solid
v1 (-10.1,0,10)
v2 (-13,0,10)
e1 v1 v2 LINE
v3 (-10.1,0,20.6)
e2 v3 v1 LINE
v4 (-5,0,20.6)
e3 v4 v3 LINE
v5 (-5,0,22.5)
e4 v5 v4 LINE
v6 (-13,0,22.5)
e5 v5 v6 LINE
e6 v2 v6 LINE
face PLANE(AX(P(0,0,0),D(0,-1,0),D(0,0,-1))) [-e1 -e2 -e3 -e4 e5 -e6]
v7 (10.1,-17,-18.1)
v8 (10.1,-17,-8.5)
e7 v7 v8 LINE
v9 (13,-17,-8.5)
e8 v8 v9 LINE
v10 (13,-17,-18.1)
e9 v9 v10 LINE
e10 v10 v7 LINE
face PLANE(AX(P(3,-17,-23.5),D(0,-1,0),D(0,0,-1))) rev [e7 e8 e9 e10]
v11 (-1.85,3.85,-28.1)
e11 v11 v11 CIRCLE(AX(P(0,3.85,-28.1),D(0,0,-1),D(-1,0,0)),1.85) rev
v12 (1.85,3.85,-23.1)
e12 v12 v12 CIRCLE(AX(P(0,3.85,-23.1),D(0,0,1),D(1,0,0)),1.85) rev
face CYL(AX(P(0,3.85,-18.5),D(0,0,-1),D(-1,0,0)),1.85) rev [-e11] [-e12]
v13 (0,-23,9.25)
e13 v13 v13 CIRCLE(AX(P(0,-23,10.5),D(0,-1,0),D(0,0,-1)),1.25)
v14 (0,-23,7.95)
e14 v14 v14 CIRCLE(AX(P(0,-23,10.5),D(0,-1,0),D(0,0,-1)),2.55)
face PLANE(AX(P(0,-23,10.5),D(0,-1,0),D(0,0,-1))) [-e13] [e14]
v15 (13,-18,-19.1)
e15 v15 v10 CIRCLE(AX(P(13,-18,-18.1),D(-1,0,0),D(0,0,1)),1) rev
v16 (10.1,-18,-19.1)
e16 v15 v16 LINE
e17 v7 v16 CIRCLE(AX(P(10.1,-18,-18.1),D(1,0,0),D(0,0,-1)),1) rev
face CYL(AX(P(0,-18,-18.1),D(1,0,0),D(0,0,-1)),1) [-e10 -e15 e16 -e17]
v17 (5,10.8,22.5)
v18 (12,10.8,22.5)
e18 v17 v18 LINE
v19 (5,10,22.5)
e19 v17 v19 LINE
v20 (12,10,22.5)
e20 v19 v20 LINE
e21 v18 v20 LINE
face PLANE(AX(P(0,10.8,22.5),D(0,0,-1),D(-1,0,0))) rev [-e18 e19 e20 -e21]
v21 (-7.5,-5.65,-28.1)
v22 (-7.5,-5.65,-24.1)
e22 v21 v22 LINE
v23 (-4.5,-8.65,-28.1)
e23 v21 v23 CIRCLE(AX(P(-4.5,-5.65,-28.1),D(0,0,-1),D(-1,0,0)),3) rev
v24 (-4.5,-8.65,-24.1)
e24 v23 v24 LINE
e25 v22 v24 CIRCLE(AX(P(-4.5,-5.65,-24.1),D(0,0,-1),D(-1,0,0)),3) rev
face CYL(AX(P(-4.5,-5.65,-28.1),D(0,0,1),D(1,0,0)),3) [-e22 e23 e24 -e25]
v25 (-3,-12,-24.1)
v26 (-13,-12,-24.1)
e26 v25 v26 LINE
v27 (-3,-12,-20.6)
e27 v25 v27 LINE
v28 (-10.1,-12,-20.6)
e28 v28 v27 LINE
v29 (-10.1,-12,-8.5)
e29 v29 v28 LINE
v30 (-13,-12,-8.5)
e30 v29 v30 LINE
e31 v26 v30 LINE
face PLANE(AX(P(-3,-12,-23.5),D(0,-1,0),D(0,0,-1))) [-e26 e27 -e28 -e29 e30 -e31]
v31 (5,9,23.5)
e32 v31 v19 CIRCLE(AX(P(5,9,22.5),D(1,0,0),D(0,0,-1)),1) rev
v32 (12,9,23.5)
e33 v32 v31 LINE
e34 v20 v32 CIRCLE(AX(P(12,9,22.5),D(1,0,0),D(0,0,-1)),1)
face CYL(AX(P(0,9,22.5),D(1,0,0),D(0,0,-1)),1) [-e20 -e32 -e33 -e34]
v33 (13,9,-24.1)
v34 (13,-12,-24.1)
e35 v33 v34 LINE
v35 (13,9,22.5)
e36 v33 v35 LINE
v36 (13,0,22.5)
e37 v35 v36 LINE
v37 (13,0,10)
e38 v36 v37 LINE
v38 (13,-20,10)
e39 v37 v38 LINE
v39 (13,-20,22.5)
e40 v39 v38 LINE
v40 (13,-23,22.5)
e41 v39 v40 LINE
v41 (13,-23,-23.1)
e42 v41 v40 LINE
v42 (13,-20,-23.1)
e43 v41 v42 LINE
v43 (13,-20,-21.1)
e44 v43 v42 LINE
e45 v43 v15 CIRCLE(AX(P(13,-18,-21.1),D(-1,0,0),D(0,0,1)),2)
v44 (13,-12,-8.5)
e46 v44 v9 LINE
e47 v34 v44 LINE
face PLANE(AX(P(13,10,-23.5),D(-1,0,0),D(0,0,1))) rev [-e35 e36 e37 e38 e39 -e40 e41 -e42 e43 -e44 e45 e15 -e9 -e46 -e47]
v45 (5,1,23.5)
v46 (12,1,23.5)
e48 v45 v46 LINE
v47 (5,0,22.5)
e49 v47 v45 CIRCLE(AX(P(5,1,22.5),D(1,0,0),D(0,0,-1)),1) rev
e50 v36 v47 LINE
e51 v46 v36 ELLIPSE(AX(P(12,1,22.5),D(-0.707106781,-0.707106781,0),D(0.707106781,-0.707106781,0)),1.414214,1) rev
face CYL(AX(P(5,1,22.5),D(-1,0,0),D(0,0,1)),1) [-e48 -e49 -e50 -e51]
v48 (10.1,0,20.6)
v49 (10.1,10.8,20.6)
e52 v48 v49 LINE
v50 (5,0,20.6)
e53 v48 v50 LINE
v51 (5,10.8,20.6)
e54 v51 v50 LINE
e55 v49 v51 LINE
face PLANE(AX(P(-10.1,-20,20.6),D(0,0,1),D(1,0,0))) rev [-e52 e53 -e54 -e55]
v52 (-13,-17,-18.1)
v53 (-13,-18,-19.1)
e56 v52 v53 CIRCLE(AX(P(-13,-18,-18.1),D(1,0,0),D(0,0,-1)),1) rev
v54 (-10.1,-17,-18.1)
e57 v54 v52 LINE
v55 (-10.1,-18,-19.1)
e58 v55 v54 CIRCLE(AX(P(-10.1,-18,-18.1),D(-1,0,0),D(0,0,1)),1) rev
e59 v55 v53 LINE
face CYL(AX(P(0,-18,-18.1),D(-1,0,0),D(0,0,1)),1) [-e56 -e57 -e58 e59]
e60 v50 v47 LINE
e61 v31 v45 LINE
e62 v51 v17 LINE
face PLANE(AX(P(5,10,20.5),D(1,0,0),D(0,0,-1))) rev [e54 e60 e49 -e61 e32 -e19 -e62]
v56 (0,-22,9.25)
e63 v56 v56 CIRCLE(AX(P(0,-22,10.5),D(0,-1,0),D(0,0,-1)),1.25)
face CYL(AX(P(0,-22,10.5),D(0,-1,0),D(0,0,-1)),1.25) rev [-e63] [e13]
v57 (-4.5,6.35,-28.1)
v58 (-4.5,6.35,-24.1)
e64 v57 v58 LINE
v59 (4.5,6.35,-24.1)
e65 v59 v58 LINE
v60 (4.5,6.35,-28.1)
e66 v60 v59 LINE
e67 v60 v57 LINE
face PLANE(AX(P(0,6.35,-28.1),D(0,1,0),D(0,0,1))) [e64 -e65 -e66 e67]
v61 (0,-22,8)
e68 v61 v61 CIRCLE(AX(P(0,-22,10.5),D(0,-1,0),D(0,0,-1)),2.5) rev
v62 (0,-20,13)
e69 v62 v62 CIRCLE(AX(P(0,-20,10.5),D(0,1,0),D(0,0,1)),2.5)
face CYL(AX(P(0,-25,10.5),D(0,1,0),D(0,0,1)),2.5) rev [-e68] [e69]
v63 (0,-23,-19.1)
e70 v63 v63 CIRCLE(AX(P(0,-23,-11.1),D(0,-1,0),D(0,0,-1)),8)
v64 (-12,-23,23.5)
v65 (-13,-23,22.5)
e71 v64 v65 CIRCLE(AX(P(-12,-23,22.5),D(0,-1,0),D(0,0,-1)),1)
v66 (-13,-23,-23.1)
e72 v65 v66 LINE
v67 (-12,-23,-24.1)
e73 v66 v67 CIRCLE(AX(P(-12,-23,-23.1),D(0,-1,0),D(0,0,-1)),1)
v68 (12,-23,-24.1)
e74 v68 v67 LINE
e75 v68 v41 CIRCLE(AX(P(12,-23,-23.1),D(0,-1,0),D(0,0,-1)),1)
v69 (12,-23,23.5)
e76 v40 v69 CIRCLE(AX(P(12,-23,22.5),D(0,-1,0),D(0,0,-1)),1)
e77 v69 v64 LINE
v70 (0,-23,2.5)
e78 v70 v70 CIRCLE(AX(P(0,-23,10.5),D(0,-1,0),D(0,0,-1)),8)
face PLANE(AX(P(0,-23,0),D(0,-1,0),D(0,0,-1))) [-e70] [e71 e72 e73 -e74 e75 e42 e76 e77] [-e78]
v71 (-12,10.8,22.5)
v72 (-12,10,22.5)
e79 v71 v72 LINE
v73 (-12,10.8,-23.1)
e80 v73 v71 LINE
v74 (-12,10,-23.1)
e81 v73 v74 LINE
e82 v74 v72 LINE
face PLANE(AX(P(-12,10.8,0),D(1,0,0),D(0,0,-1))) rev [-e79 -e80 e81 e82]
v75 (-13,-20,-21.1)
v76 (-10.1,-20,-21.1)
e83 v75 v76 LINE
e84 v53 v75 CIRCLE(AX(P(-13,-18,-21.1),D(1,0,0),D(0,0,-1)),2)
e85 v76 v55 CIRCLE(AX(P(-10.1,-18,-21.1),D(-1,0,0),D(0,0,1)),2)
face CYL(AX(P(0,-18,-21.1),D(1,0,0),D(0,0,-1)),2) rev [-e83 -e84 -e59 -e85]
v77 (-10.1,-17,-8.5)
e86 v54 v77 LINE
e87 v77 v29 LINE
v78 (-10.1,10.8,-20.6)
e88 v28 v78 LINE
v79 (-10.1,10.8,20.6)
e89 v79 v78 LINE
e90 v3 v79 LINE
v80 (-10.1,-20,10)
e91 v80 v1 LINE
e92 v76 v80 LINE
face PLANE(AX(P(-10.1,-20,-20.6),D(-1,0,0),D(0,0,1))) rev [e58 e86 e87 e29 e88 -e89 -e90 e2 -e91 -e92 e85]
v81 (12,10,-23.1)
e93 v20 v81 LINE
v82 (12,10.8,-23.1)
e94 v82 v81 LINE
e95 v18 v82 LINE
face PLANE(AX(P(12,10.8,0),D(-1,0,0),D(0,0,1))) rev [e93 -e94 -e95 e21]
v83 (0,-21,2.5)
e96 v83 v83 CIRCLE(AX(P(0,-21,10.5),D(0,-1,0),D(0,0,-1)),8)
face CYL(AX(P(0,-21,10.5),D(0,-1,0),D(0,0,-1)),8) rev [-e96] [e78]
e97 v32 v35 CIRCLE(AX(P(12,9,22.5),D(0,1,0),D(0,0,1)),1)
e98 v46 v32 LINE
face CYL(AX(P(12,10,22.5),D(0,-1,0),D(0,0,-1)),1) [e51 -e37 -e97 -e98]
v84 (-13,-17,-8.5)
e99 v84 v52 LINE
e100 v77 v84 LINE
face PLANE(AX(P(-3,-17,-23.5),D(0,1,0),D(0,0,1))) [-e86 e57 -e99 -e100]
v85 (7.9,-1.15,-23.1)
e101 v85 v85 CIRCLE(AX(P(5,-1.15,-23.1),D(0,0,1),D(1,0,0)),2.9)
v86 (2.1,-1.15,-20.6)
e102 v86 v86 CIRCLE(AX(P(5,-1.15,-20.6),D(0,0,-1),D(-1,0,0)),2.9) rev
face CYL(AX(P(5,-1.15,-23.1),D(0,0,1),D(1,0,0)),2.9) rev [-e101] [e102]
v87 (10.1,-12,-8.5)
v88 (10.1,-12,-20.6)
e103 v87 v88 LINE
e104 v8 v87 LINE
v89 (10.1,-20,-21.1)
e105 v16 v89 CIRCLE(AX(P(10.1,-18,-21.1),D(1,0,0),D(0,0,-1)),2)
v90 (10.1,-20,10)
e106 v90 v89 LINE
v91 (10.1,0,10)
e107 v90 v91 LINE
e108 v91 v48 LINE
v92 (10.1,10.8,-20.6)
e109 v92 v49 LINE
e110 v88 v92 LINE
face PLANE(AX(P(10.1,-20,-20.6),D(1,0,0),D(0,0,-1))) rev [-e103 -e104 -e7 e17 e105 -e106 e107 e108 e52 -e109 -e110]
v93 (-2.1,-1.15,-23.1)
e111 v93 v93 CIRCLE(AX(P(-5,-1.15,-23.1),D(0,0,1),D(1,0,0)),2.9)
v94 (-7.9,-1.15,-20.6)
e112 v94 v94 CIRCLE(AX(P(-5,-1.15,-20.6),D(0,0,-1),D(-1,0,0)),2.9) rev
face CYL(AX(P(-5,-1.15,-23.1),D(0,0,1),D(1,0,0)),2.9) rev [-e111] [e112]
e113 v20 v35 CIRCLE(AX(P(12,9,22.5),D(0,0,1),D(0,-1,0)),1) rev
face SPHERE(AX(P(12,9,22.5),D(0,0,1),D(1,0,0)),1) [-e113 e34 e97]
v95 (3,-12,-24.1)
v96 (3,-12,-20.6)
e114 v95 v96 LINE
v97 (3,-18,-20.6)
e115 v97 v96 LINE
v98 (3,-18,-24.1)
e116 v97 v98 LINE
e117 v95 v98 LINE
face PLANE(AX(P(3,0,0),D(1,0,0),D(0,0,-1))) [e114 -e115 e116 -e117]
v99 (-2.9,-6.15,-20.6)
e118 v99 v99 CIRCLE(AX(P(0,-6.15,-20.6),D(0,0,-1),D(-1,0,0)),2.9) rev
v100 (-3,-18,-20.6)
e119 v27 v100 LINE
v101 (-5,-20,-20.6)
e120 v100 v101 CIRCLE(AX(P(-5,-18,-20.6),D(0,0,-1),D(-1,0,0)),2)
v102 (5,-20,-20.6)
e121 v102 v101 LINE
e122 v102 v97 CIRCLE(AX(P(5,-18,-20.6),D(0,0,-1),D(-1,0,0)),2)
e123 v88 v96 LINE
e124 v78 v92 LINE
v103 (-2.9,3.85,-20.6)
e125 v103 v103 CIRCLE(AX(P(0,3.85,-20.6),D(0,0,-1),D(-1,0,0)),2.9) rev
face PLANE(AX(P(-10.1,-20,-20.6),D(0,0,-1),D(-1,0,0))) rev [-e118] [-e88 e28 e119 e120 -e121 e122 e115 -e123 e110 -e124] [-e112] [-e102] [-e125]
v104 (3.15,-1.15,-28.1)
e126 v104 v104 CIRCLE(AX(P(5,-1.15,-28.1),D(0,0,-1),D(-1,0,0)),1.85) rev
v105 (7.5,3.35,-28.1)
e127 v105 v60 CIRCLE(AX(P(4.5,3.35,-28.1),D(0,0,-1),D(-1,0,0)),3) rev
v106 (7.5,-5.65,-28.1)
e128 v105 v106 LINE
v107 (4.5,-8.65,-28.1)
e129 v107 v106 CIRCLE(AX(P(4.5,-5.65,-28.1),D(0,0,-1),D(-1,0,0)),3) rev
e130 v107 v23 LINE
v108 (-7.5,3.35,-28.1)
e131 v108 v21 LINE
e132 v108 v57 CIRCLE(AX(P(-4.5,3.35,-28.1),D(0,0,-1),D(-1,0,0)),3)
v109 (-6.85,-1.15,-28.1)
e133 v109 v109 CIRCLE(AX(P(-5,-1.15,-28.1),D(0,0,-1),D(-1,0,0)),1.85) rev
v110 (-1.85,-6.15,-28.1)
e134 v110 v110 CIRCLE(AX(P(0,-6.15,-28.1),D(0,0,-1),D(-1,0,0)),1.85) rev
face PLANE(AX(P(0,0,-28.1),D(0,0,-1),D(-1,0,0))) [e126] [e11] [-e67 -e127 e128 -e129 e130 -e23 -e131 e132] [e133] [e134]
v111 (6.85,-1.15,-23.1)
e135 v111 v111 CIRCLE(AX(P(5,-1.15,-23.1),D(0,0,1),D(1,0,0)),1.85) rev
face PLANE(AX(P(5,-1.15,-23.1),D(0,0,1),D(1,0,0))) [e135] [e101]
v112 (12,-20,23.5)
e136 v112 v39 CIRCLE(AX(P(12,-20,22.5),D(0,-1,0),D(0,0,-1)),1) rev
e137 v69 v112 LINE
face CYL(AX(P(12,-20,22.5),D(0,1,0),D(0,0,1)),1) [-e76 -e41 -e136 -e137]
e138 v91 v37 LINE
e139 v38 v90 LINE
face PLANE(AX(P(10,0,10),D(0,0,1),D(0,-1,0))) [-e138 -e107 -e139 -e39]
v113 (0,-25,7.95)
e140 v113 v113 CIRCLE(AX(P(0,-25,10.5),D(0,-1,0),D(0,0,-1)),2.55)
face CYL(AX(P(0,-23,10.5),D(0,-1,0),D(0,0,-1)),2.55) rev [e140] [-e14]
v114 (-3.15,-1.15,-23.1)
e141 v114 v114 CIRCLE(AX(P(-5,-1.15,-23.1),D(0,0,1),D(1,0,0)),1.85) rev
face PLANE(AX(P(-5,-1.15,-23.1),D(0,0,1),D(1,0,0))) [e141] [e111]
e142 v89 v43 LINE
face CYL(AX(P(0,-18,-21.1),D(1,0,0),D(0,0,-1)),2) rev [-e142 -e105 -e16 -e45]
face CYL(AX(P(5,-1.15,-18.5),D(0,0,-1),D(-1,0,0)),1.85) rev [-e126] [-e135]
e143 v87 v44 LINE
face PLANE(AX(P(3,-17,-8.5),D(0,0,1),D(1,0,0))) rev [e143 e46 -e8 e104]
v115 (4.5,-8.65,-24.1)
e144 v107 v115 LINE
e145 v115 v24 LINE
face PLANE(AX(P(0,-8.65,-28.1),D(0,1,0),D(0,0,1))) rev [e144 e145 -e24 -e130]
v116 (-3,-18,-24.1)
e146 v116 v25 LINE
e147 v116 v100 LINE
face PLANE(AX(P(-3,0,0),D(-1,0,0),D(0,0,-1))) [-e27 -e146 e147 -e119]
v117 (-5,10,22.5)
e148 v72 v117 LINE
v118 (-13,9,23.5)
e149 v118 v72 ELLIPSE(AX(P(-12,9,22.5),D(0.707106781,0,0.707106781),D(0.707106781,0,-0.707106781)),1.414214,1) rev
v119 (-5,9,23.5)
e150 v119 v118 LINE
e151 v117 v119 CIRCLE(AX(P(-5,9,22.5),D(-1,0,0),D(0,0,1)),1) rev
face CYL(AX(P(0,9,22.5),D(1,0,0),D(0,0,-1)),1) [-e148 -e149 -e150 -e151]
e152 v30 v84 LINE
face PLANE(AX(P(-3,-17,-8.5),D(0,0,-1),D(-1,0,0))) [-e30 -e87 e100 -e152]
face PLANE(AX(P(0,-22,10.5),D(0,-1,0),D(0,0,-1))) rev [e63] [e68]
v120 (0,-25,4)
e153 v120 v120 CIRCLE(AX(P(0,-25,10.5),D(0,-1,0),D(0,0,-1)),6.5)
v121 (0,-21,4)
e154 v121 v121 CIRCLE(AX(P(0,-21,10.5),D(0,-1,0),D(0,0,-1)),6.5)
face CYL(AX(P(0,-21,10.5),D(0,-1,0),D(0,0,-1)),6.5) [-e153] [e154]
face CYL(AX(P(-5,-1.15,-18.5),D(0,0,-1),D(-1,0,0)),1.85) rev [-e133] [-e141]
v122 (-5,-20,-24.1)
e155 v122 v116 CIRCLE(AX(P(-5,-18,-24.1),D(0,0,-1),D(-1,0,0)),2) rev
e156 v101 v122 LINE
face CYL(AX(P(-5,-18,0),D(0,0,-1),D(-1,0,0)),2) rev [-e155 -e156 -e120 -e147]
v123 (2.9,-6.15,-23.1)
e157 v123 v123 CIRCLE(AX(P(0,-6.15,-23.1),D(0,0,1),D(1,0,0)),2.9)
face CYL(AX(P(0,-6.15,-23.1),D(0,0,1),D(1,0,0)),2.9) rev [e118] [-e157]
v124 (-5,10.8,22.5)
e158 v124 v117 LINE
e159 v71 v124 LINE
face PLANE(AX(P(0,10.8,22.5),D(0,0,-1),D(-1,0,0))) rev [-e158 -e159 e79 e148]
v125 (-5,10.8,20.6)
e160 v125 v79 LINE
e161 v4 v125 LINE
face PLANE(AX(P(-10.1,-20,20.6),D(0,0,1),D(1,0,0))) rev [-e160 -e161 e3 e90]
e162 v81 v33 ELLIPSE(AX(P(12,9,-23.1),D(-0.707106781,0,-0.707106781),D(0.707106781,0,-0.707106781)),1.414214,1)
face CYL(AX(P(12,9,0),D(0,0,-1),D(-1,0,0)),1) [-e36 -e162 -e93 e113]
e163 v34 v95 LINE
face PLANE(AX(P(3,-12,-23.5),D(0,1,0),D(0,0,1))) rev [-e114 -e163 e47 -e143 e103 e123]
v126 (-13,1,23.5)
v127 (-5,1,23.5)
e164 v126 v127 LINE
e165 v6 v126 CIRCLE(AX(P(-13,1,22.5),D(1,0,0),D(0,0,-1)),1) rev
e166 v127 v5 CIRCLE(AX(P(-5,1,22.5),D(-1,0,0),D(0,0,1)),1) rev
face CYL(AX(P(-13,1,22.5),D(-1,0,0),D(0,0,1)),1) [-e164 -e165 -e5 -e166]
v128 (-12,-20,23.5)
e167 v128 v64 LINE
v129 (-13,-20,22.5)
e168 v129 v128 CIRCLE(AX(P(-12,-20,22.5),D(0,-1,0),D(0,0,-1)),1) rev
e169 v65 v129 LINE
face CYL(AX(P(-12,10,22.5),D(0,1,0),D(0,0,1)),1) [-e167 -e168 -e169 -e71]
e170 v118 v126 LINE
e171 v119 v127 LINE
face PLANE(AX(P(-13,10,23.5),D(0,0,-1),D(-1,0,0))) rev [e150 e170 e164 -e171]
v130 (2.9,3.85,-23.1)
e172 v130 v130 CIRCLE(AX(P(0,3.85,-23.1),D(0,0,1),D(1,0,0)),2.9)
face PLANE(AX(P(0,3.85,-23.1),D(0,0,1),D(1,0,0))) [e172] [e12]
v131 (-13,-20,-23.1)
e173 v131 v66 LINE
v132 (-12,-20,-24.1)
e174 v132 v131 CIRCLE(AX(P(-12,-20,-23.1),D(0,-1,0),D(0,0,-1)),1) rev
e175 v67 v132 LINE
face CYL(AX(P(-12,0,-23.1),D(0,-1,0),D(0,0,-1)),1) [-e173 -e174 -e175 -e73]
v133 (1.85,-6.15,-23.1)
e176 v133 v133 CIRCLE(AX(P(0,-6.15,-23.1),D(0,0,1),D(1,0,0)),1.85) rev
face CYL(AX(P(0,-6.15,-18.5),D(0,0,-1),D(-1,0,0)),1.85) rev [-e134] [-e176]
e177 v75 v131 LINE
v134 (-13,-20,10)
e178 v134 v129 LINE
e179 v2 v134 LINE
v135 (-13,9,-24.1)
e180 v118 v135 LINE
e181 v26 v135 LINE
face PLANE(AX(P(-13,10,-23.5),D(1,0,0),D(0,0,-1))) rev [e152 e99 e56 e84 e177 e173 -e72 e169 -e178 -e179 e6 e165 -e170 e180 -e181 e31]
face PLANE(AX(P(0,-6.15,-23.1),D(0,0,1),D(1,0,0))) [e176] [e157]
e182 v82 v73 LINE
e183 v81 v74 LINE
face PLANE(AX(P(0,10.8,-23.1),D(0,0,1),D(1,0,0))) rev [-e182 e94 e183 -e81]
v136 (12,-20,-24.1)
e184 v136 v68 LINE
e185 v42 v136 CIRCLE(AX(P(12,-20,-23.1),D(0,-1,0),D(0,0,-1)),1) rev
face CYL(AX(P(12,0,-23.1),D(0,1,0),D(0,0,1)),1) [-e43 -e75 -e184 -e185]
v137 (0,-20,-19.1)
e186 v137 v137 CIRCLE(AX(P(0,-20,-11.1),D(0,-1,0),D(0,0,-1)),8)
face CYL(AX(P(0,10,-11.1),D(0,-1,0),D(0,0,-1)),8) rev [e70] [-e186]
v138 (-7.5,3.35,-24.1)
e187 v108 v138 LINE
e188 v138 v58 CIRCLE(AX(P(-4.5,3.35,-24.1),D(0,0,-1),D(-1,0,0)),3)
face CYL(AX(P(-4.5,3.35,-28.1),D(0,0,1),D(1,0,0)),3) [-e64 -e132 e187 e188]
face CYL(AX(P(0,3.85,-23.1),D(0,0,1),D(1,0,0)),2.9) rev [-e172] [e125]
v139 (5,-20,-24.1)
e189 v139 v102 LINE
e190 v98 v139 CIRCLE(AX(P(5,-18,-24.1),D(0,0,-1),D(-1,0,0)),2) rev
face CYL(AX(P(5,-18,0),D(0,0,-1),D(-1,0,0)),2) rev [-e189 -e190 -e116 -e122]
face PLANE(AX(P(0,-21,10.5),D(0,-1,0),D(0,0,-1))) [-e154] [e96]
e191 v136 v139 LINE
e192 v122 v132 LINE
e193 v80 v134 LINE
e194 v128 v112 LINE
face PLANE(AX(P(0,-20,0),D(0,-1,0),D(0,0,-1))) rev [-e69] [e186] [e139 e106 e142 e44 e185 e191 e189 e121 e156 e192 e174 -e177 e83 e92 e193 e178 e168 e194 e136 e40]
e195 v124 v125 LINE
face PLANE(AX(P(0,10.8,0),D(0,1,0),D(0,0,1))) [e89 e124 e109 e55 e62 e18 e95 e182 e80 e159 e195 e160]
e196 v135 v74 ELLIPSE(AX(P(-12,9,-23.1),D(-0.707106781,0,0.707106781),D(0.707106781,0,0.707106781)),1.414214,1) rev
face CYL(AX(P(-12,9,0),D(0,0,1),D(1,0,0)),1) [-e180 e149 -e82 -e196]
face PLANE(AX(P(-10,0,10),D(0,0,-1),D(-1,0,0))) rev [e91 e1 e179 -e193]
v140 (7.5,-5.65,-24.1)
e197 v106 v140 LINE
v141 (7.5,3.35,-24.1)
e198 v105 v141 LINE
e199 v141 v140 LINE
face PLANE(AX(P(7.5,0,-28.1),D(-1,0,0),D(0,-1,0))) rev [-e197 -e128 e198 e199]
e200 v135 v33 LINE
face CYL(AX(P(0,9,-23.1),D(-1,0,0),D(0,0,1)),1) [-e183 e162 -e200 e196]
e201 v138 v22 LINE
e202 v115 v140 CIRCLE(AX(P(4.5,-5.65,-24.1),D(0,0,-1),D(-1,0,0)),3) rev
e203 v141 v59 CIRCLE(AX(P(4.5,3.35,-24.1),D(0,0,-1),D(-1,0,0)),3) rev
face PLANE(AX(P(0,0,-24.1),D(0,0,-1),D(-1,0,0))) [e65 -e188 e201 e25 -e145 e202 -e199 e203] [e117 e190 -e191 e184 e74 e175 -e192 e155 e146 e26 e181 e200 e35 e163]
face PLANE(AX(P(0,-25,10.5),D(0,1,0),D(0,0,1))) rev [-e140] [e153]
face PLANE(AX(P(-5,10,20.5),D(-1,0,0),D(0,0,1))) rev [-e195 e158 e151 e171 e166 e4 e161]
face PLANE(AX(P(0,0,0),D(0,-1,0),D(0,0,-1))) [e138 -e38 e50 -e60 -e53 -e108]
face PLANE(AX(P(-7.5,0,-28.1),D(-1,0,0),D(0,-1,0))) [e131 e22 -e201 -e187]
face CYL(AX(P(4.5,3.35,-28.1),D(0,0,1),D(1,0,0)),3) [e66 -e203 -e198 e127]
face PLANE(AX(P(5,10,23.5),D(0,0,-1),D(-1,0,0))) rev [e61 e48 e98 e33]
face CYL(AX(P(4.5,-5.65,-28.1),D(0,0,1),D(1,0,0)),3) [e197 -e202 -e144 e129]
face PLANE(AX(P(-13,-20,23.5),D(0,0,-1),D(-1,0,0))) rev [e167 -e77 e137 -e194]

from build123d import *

# Parameters (mm, degrees)
BOSS_EXTRUDE1_DEPTH      = 10
SKETCH2_W                = 20
SKETCH2_H                = 17
BOSS_EXTRUDE2_DEPTH      = 3
SKETCH3_W                = 26
SKETCH3_H                = 47
BOSS_EXTRUDE3_DEPTH      = 3
SKETCH5_R                = 8
SKETCH5_W                = 16
SKETCH5_H                = 4
CUT_EXTRUDE1_DEPTH       = 41.264748851
BOSS_EXTRUDE4_DEPTH      = 26
SKETCH7_W                = 20
SKETCH7_H                = 10.5
CUT_EXTRUDE2_DEPTH       = 10
SKETCH9_W                = 8
SKETCH9_H                = 6
CUT_EXTRUDE3_DEPTH       = 10
SKETCH10_W               = 30
SKETCH10_H               = 30
BOSS_EXTRUDE5_DEPTH      = 3
SKETCH11_R               = 1.75
CUT_EXTRUDE4_DEPTH       = 5
BOSS_EXTRUDE6_START      = 3
SKETCH12_W               = 26
SKETCH12_H               = 47
SKETCH12_R               = 8
BOSS_EXTRUDE6_DEPTH      = 3
CUT_EXTRUDE5_START       = -3
SKETCH14_R               = 8
SKETCH14_W               = 16
SKETCH14_H               = 4
CUT_EXTRUDE5_DEPTH       = 3
CUT_EXTRUDE7_DEPTH       = 49.674942219
CUT_EXTRUDE7_DEPTH_BACK  = 49.674942219
BOSS_EXTRUDE7_DEPTH      = 10.7
SKETCH18_W               = 15
SKETCH18_H               = 5
CUT_EXTRUDE8_DEPTH       = 10
SKETCH21_R               = 1.85
CUT_EXTRUDE9_DEPTH       = 5
SKETCH22_R               = 2.9
CUT_EXTRUDE10_DEPTH      = 2.6
BOSS_EXTRUDE11_OUTLINE_R = 1.85
BOSS_EXTRUDE11_DEPTH     = 0.6
SKETCH24_R               = 1.85
BOSS_EXTRUDE12_DEPTH     = 4
SKETCH25_W               = 7
SKETCH25_H               = 3
CUT_EXTRUDE11_DEPTH      = 5
SKETCH26_W               = 20.2
SKETCH26_H               = 41.2
CUT_EXTRUDE12_DEPTH      = 30
SKETCH27_W               = 0.1
SKETCH27_H               = 3
CUT_EXTRUDE13_DEPTH      = 55.440426156
SKETCH28_R               = 8
CUT_EXTRUDE14_DEPTH      = 46.250524859
SKETCH29_W               = 2.9
SKETCH29_H               = 3
CUT_EXTRUDE15_DEPTH      = 5
FILLET1_R                = 2
FILLET2_R                = 2
FILLET3_R                = 1
BOSS_EXTRUDE13_START     = -5
SKETCH35_R               = 8
SKETCH35_R_2             = 2.5
BOSS_EXTRUDE13_DEPTH     = 5
BOSS_EXTRUDE14_DEPTH     = 0.8
SKETCH38_R               = 2.55
SKETCH38_R_2             = 2.5
CUT_EXTRUDE16_DEPTH      = 2
SKETCH39_R               = 2.55
SKETCH39_R_2             = 1.25
BOSS_EXTRUDE15_DEPTH     = 1
SKETCH40_R               = 8
SKETCH40_R_2             = 6.5
CUT_EXTRUDE17_DEPTH      = 4


# Read off the part's stored shape, not the designer's step: Boss-Extrude11
with BuildPart() as part:
    # Sketch1 → Boss-Extrude1 (new body)
    with BuildSketch(Plane(origin=(0, 0, 0), x_dir=(1, 0, 0), z_dir=(0, 1, 0))):
        Polygon((5, -23.5), (13, -23.5), (13, 23.5), (-13, 23.5), (-13, -23.5), (-5, -23.5), (-5, -20.5), (-10, -20.5), (-10, 20.5), (10, 20.5), (10, -20.5), (5, -20.5), align=None)
    extrude(amount=BOSS_EXTRUDE1_DEPTH)

    # Sketch2 → Boss-Extrude2 (add)
    with BuildSketch(Plane(origin=(13, 0, 0), x_dir=(0, 0, -1), z_dir=(1, 0, 0))):
        with Locations((0, -8.5)):
            Rectangle(SKETCH2_W, SKETCH2_H)
    boss_extrude2 = extrude(amount=-BOSS_EXTRUDE2_DEPTH)

    # Mirror1: Boss-Extrude2 across plane
    add(boss_extrude2.mirror(Plane(origin=(0, 0, 0), x_dir=(0, 0, 1), z_dir=(1, 0, 0))))

    # Sketch3 → Boss-Extrude3 (add)
    with BuildSketch(Plane.XZ.offset(17)):
        Rectangle(SKETCH3_W, SKETCH3_H)
    extrude(amount=BOSS_EXTRUDE3_DEPTH)

    # Sketch5 → Cut-Extrude1 (cut, through all)
    with BuildSketch(Plane.XZ.offset(20)):
        with Locations(Location((0, 10.5, 0), (0, 0, 270))):
            Circle(SKETCH5_R)
        with Locations((0, -6.5)):
            Rectangle(SKETCH5_W, SKETCH5_H)
        with Locations((0, -14.5)):
            Rectangle(SKETCH5_W, SKETCH5_H)
    extrude(amount=-CUT_EXTRUDE1_DEPTH, mode=Mode.SUBTRACT)

    # Sketch6 → Boss-Extrude4 (add)
    with BuildSketch(Plane(origin=(13, 0, 0), x_dir=(0, 0, -1), z_dir=(1, 0, 0))):
        Polygon((29.5, 4.35), (23.5, 4.35), (23.5, 0), (23.5, -3.65), (29.5, -3.65), align=None)
        Polygon((23.5, -3.65), (23.5, 0), (10, 0), (10, -9.3), (23.5, -9.3), align=None)
    extrude(amount=-BOSS_EXTRUDE4_DEPTH)

    # Sketch7 → Cut-Extrude2 (cut)
    with BuildSketch(Plane(origin=(0, 0, 0), x_dir=(1, 0, 0), z_dir=(0, 1, 0))):
        with Locations((0, 15.25)):
            Rectangle(SKETCH7_W, SKETCH7_H)
    extrude(amount=-CUT_EXTRUDE2_DEPTH, mode=Mode.SUBTRACT)

    # Sketch9 → Cut-Extrude3 (cut)
    with BuildSketch(Plane(origin=(0, 4.35, 0), x_dir=(1, 0, 0), z_dir=(0, 1, 0))):
        with Locations((-9, 26.5)):
            Rectangle(SKETCH9_W, SKETCH9_H)
        with Locations((9, 26.5)):
            Rectangle(SKETCH9_W, SKETCH9_H)
    extrude(amount=-CUT_EXTRUDE3_DEPTH, mode=Mode.SUBTRACT)

    # Sketch10 → Boss-Extrude5 (add)
    with BuildSketch(Plane(origin=(0, 0, -29.5), x_dir=(-1, 0, 0), z_dir=(0, 0, -1))):
        Rectangle(SKETCH10_W, SKETCH10_H)
    extrude(amount=BOSS_EXTRUDE5_DEPTH)

    # Sketch11 → Cut-Extrude4 (cut)
    with BuildSketch(Plane(origin=(0, 0, -32.5), x_dir=(-1, 0, 0), z_dir=(0, 0, -1))):
        with Locations((0, 10)):
            Circle(SKETCH11_R)
        with Locations((10, 0)):
            Circle(SKETCH11_R)
        with Locations((0, -10)):
            Circle(SKETCH11_R)
        with Locations((-10, 0)):
            Circle(SKETCH11_R)
    extrude(amount=-CUT_EXTRUDE4_DEPTH, mode=Mode.SUBTRACT)

    # Sketch12 → Boss-Extrude6 (add)
    with BuildSketch(Plane.XZ.offset(20).offset(BOSS_EXTRUDE6_START)):
        Rectangle(SKETCH12_W, SKETCH12_H)
        with Locations(Location((0, 10.5, 0), (0, 0, 270))):
            Circle(SKETCH12_R, mode=Mode.SUBTRACT)
    extrude(amount=-BOSS_EXTRUDE6_DEPTH)

    # Sketch14 → Cut-Extrude5 (cut)
    with BuildSketch(Plane(origin=(0, -17, 0), x_dir=(1, 0, 0), z_dir=(0, 1, 0)).offset(CUT_EXTRUDE5_START)):
        Polygon((13, -23.5), (13, -10), (10, -10), (10, 10), (13, 10), (13, 23.5), (-13, 23.5), (-13, 10), (-10, 10), (-10, -10), (-13, -10), (-13, -23.5), align=None)
        with Locations(Location((0, -10.5, 0), (0, 0, 90))):
            Circle(SKETCH14_R, mode=Mode.SUBTRACT)
        with Locations((0, 6.5)):
            Rectangle(SKETCH14_W, SKETCH14_H, mode=Mode.SUBTRACT)
        with Locations((0, 14.5)):
            Rectangle(SKETCH14_W, SKETCH14_H, mode=Mode.SUBTRACT)
    extrude(amount=CUT_EXTRUDE5_DEPTH, mode=Mode.SUBTRACT)

    # Sketch15 → Cut-Extrude7 (cut, two sides: drawn at the far end of the back side and taken through both)
    with BuildSketch(Plane(origin=(13, 0, 0), x_dir=(0, 0, -1), z_dir=(1, 0, 0)).offset(-CUT_EXTRUDE7_DEPTH_BACK)):
        Polygon((23.5, -9.3), (23.5, -15.243835525), (32.5, -15.243835525), (32.5, 15), (23.5, 15), (23.5, 10), align=None)
    extrude(amount=CUT_EXTRUDE7_DEPTH + CUT_EXTRUDE7_DEPTH_BACK, mode=Mode.SUBTRACT)

    # Sketch16 → Boss-Extrude7 (add)
    with BuildSketch(Plane.XZ.offset(9.3)):
        Polygon((10, -10), (10, -20.5), (-10, -20.5), (-10, -10), (-13, -10), (-13, -23.5), (13, -23.5), (13, -10), align=None)
    extrude(amount=BOSS_EXTRUDE7_DEPTH)

    # Sketch18 → Cut-Extrude8 (cut)
    with BuildSketch(Plane(origin=(13, 0, 0), x_dir=(0, 0, -1), z_dir=(1, 0, 0))):
        with Locations((16, -14.5)):
            Rectangle(SKETCH18_W, SKETCH18_H)
    cut_extrude8 = extrude(amount=-CUT_EXTRUDE8_DEPTH, mode=Mode.SUBTRACT)

    # Mirror2: Cut-Extrude8 across plane
    add(cut_extrude8.mirror(Plane(origin=(0, 0, 0), x_dir=(0, 0, 1), z_dir=(1, 0, 0))), mode=Mode.SUBTRACT)

    # Sketch21 → Cut-Extrude9 (cut)
    with BuildSketch(Plane(origin=(0, 0, -23.5), x_dir=(-1, 0, 0), z_dir=(0, 0, -1))):
        with Locations((-5, -1.15)):
            Circle(SKETCH21_R)
        with Locations((0, 3.85)):
            Circle(SKETCH21_R)
        with Locations((5, -1.15)):
            Circle(SKETCH21_R)
        with Locations((0, -6.15)):
            Circle(SKETCH21_R)
    extrude(amount=-CUT_EXTRUDE9_DEPTH, mode=Mode.SUBTRACT)

    # Sketch22 → Cut-Extrude10 (cut)
    with BuildSketch(Plane.XY.offset(-20.5)):
        with Locations((0, 3.85)):
            Circle(SKETCH22_R)
        with Locations((5, -1.15)):
            Circle(SKETCH22_R)
        with Locations((0, -6.15)):
            Circle(SKETCH22_R)
        with Locations((-5, -1.15)):
            Circle(SKETCH22_R)
    extrude(amount=-CUT_EXTRUDE10_DEPTH, mode=Mode.SUBTRACT)

    # Boss-Extrude11 outline → Boss-Extrude11 (add)
    with BuildSketch(Plane(origin=(0, 0, -23.5), x_dir=(-1, 0, 0), z_dir=(0, 0, -1))):
        Polygon((-13, -12), (-3, -12), (-3, -17), (-13, -17), (-13, -23), (13, -23), (13, -17), (3, -17), (3, -12), (13, -12), (13, 10), (-13, 10), align=None)
        with Locations((-5, -1.15)):
            Circle(BOSS_EXTRUDE11_OUTLINE_R, mode=Mode.SUBTRACT)
        with Locations((0, -6.15)):
            Circle(BOSS_EXTRUDE11_OUTLINE_R, mode=Mode.SUBTRACT)
        with Locations((5, -1.15)):
            Circle(BOSS_EXTRUDE11_OUTLINE_R, mode=Mode.SUBTRACT)
        with Locations((0, 3.85)):
            Circle(BOSS_EXTRUDE11_OUTLINE_R, mode=Mode.SUBTRACT)
    extrude(amount=BOSS_EXTRUDE11_DEPTH)

    # Sketch24 → Boss-Extrude12 (add)
    with BuildSketch(Plane(origin=(0, 0, -24.1), x_dir=(-1, 0, 0), z_dir=(0, 0, -1))):
        with BuildLine():
            ThreePointArc((-7.5, 3.35), (-6.621320344, 5.471320344), (-4.5, 6.35))
            Line((-4.5, 6.35), (4.5, 6.35))
            ThreePointArc((4.5, 6.35), (6.621320344, 5.471320344), (7.5, 3.35))
            Line((7.5, 3.35), (7.5, -5.65))
            ThreePointArc((7.5, -5.65), (6.621320344, -7.771320344), (4.5, -8.65))
            Line((4.5, -8.65), (-4.5, -8.65))
            ThreePointArc((-4.5, -8.65), (-6.621320344, -7.771320344), (-7.5, -5.65))
            Line((-7.5, -5.65), (-7.5, 3.35))
        make_face()
        with Locations((0, -6.15)):
            Circle(SKETCH24_R, mode=Mode.SUBTRACT)
        with Locations((5, -1.15)):
            Circle(SKETCH24_R, mode=Mode.SUBTRACT)
        with Locations((-5, -1.15)):
            Circle(SKETCH24_R, mode=Mode.SUBTRACT)
        with Locations((0, 3.85)):
            Circle(SKETCH24_R, mode=Mode.SUBTRACT)
    extrude(amount=BOSS_EXTRUDE12_DEPTH)

    # Sketch25 → Cut-Extrude11 (cut)
    with BuildSketch(Plane(origin=(0, 0, -24.1), x_dir=(-1, 0, 0), z_dir=(0, 0, -1))):
        with Locations((-6.5, -18.5)):
            Rectangle(SKETCH25_W, SKETCH25_H)
        with Locations((6.5, -18.5)):
            Rectangle(SKETCH25_W, SKETCH25_H)
    extrude(amount=-CUT_EXTRUDE11_DEPTH, mode=Mode.SUBTRACT)

    # Sketch26 → Cut-Extrude12 (cut)
    with BuildSketch(Plane(origin=(0, 10, 0), x_dir=(1, 0, 0), z_dir=(0, 1, 0))):
        Rectangle(SKETCH26_W, SKETCH26_H)
    extrude(amount=-CUT_EXTRUDE12_DEPTH, mode=Mode.SUBTRACT)

    # Sketch27 → Cut-Extrude13 (cut, through all)
    with BuildSketch(Plane(origin=(0, 0, -24.1), x_dir=(-1, 0, 0), z_dir=(0, 0, -1))):
        with Locations((-10.05, -18.5)):
            Rectangle(SKETCH27_W, SKETCH27_H)
        with Locations((10.05, -18.5)):
            Rectangle(SKETCH27_W, SKETCH27_H)
    extrude(amount=-CUT_EXTRUDE13_DEPTH, mode=Mode.SUBTRACT)

    # Sketch28 → Cut-Extrude14 (cut, through all)
    with BuildSketch(Plane.XZ.offset(23)):
        with Locations(Location((0, -11.1, 0), (0, 0, 270))):
            Circle(SKETCH28_R)
    extrude(amount=-CUT_EXTRUDE14_DEPTH, mode=Mode.SUBTRACT)

    # Sketch29 → Cut-Extrude15 (cut)
    with BuildSketch(Plane(origin=(0, 0, -24.1), x_dir=(-1, 0, 0), z_dir=(0, 0, -1))):
        with Locations((-11.55, -18.5)):
            Rectangle(SKETCH29_W, SKETCH29_H)
        with Locations((11.55, -18.5)):
            Rectangle(SKETCH29_W, SKETCH29_H)
    extrude(amount=-CUT_EXTRUDE15_DEPTH, mode=Mode.SUBTRACT)

    # Fillet1
    fillet1_edges = [part.edges().sort_by_distance(p)[0] for p in [
        (-3, -20, -22.35),
        (3, -20, -22.35),
    ]]
    fillet(fillet1_edges, radius=FILLET1_R)

    # Fillet2
    fillet2_edges = [part.edges().sort_by_distance(p)[0] for p in [
        (11.55, -20, -19.1),
        (-11.55, -20, -19.1),
    ]]
    fillet(fillet2_edges, radius=FILLET2_R)

    # Fillet3
    fillet3_edges = [part.edges().sort_by_distance(p)[0] for p in [
        (11.55, -17, -19.1),
        (-11.55, -17, -19.1),
        (-9, 10, 23.5),
        (-13, 10, -0.3),
        (0, 10, -24.1),
        (13, 10, -0.3),
        (9, 10, 23.5),
        (13, 5, 23.5),
        (9, 0, 23.5),
        (-9, 0, 23.5),
        (13, -21.5, -24.1),
        (-13, -21.5, -24.1),
        (-13, -21.5, 23.5),
        (13, -21.5, 23.5),
    ]]
    fillet(fillet3_edges, radius=FILLET3_R - 0.0001)  # a hair under: the kernel refuses the full size

    # Sketch35 → Boss-Extrude13 (add)
    with BuildSketch(Plane(origin=(0, -20, 0), x_dir=(1, 0, 0), z_dir=(0, 1, 0)).offset(BOSS_EXTRUDE13_START)):
        with Locations(Location((0, -10.5, 0), (0, 0, 270))):
            Circle(SKETCH35_R)
        with Locations(Location((0, -10.5, 0), (0, 0, 270))):
            Circle(SKETCH35_R_2, mode=Mode.SUBTRACT)
    extrude(amount=BOSS_EXTRUDE13_DEPTH)

    # Sketch36 → Boss-Extrude14 (add)
    with BuildSketch(Plane(origin=(0, 10, 0), x_dir=(1, 0, 0), z_dir=(0, 1, 0))):
        Polygon((12, 23.1), (-12, 23.1), (-12, -22.5), (-5, -22.5), (-5, -20.6), (-10.1, -20.6), (-10.1, 20.6), (10.1, 20.6), (10.1, -20.6), (5, -20.6), (5, -22.5), (12, -22.5), align=None)
    extrude(amount=BOSS_EXTRUDE14_DEPTH)

    # Sketch38 → Cut-Extrude16 (cut)
    with BuildSketch(Plane.XZ.offset(25)):
        with Locations(Location((0, 10.5, 0), (0, 0, 270))):
            Circle(SKETCH38_R)
        with Locations(Location((0, 10.5, 0), (0, 0, 90))):
            Circle(SKETCH38_R_2, mode=Mode.SUBTRACT)
    extrude(amount=-CUT_EXTRUDE16_DEPTH, mode=Mode.SUBTRACT)

    # Sketch39 → Boss-Extrude15 (add)
    with BuildSketch(Plane.XZ.offset(23)):
        with Locations(Location((0, 10.5, 0), (0, 0, 270))):
            Circle(SKETCH39_R)
        with Locations(Location((0, 10.5, 0), (0, 0, 270))):
            Circle(SKETCH39_R_2, mode=Mode.SUBTRACT)
    extrude(amount=-BOSS_EXTRUDE15_DEPTH)

    # Sketch40 → Cut-Extrude17 (cut)
    with BuildSketch(Plane.XZ.offset(25)):
        with Locations(Location((0, 10.5, 0), (0, 0, 270))):
            Circle(SKETCH40_R)
        with Locations(Location((0, 10.5, 0), (0, 0, 270))):
            Circle(SKETCH40_R_2, mode=Mode.SUBTRACT)
    extrude(amount=-CUT_EXTRUDE17_DEPTH, mode=Mode.SUBTRACT)


solid = part.part
